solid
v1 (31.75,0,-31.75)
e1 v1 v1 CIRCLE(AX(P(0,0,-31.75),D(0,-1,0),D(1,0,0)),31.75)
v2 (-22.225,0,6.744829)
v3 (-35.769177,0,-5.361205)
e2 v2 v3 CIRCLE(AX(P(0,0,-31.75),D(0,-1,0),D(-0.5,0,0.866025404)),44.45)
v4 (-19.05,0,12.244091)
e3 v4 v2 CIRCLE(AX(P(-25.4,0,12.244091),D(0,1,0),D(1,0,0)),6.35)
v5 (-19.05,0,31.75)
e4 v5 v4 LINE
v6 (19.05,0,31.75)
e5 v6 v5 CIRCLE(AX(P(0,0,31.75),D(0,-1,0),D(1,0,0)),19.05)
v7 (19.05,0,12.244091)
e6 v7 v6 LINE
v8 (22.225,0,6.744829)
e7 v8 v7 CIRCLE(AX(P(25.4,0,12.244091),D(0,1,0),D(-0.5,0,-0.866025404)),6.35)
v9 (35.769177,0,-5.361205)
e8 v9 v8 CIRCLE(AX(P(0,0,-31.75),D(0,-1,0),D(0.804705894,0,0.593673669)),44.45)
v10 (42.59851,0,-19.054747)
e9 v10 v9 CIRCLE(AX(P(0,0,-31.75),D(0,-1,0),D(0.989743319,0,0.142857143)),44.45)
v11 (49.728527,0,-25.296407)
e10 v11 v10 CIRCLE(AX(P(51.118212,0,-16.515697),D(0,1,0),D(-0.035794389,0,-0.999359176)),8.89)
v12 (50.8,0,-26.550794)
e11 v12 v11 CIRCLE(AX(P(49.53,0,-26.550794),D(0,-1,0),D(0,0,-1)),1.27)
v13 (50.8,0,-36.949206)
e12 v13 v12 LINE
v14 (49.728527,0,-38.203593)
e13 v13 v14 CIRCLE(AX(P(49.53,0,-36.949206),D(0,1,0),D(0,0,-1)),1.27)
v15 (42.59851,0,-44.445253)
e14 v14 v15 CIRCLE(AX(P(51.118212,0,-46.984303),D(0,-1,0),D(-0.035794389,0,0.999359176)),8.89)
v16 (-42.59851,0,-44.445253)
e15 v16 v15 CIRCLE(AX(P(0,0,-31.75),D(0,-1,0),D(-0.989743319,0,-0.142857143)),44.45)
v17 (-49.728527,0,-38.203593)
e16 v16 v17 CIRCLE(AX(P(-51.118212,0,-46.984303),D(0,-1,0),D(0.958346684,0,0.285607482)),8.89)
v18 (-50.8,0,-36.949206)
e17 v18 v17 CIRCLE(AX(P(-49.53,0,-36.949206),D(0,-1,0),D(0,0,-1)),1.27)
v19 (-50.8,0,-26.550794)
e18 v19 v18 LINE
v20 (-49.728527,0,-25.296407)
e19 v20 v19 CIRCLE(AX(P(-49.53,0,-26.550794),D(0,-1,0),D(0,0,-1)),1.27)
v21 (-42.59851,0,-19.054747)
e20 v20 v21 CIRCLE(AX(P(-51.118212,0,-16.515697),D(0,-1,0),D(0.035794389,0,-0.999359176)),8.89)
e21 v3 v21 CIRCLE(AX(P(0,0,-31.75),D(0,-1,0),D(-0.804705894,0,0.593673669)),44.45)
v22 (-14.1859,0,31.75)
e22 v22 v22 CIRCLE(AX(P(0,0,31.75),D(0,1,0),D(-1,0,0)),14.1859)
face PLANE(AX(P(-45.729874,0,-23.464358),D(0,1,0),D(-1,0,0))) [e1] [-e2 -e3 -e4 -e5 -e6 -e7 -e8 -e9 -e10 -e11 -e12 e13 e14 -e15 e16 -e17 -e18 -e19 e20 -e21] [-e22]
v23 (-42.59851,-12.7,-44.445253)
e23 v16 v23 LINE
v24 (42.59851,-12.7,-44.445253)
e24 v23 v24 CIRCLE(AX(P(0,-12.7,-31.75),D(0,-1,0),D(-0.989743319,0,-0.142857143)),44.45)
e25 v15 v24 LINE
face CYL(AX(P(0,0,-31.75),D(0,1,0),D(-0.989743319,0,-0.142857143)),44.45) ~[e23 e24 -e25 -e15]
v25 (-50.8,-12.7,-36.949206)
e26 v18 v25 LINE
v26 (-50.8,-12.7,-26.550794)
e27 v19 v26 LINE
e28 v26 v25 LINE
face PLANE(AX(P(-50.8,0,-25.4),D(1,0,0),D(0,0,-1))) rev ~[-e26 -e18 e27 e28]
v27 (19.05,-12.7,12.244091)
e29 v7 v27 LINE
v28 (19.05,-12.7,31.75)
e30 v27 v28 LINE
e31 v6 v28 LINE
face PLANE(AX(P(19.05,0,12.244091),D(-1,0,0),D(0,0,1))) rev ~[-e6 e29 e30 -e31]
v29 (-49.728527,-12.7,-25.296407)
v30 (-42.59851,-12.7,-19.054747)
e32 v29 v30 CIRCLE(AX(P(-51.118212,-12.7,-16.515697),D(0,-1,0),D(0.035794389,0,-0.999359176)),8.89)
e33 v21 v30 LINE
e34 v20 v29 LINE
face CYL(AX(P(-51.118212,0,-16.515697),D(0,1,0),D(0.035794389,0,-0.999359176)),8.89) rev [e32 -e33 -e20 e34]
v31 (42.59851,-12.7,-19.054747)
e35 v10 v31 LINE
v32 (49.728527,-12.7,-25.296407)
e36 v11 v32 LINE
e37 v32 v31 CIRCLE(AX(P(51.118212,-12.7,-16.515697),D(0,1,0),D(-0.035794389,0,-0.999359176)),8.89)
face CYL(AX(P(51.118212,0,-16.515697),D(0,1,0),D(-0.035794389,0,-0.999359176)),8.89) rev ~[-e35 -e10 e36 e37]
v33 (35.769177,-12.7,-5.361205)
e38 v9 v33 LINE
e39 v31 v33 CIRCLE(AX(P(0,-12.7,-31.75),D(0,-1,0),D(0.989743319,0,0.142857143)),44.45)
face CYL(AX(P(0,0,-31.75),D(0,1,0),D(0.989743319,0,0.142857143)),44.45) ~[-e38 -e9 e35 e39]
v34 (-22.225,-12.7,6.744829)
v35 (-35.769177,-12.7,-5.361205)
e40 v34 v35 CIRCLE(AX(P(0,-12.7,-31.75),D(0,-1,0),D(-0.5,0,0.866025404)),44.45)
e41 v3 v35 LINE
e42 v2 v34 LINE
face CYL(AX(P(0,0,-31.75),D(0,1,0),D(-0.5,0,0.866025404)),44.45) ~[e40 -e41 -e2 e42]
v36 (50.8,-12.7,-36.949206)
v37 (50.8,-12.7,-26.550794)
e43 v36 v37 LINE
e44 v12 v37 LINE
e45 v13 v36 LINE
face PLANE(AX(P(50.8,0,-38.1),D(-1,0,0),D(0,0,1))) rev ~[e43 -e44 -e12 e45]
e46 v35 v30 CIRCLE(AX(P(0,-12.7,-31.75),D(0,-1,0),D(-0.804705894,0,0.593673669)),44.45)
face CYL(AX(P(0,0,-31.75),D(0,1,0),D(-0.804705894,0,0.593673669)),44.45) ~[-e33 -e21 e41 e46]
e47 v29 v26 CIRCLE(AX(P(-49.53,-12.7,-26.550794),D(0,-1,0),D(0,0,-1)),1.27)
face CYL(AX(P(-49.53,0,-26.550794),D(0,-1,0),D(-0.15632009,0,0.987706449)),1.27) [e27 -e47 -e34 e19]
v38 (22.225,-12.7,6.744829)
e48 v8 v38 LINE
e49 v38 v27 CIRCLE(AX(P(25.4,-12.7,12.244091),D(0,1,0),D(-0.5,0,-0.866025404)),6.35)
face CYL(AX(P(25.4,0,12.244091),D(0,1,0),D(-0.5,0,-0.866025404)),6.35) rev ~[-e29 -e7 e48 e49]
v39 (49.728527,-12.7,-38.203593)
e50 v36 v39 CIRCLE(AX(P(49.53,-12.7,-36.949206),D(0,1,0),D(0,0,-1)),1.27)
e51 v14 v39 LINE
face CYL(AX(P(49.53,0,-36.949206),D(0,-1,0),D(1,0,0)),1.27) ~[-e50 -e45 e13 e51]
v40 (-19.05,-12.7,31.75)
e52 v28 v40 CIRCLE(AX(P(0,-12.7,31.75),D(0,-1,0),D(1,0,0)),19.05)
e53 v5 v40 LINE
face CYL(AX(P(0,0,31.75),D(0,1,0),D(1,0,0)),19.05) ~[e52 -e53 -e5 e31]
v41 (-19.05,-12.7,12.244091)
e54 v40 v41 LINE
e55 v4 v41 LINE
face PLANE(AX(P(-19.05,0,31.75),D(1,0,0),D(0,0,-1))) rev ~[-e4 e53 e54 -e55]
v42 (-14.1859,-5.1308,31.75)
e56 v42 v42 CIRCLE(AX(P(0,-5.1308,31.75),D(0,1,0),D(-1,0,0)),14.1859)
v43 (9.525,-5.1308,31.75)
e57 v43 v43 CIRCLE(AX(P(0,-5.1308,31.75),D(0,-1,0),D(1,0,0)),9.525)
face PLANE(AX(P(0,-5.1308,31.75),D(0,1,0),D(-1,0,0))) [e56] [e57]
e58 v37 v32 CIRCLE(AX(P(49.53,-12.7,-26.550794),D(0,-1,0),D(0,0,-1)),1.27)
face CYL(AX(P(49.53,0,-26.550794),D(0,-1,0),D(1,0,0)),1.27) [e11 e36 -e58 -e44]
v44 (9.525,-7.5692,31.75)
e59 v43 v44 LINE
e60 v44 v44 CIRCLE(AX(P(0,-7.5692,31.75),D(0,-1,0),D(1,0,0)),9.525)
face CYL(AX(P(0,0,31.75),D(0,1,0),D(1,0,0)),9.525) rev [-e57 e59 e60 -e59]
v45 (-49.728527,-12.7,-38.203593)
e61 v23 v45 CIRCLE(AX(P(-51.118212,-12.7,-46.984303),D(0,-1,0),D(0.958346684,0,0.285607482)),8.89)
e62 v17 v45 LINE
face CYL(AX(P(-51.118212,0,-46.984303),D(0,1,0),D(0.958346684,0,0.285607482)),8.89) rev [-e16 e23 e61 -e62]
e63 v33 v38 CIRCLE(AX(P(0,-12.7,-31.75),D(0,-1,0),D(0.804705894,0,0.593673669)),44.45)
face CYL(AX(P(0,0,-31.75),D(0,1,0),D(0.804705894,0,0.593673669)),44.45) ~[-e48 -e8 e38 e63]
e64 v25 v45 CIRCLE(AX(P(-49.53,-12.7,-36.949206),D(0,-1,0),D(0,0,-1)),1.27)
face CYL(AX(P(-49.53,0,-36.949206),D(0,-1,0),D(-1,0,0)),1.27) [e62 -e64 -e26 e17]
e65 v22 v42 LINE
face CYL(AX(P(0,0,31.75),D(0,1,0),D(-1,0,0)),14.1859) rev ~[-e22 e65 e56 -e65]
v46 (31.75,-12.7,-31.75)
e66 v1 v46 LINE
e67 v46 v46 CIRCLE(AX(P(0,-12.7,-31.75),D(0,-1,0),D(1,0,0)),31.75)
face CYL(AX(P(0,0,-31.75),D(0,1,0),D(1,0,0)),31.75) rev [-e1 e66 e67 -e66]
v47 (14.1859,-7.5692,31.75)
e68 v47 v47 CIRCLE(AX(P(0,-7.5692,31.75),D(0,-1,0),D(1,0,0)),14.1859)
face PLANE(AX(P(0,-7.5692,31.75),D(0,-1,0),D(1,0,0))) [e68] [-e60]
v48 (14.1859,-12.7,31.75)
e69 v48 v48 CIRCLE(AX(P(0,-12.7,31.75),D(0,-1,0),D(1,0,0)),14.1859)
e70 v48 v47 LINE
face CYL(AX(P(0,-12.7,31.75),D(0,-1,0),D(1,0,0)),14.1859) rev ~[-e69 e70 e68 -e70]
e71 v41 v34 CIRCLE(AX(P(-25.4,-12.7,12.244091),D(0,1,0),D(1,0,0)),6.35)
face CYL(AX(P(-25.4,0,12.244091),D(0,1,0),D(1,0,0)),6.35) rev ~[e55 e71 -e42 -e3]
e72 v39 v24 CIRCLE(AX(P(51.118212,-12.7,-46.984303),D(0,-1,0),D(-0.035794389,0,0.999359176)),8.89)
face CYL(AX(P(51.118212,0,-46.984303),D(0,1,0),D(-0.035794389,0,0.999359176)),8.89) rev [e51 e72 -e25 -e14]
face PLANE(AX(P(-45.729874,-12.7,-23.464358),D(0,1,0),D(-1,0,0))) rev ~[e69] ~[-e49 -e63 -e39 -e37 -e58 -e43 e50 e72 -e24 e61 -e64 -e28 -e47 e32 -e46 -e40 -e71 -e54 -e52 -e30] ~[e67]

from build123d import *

# Parameters (mm, degrees)
F0_R        = 31.75
F0_R_2      = 9.525
F1_DEPTH    = 12.7
F2_T1_DEPTH = 12.7
F3_R        = 1.27
F4_R        = 14.1859
F4_R_2      = 9.525
F5_DEPTH    = 5.1308
F6_R        = 14.1859
F6_R_2      = 9.525
F7_DEPTH    = 5.1308


# Not quite as in the source:
# - a fillet or chamfer that OpenCascade refuses, or shapes differently, is made with other operations: its cross-section is extruded or revolved along the edge and cut away or added


with BuildPart() as f1:
    # F0 (on Front) → F1 (new body)
    with BuildSketch(Plane.XZ):
        with BuildLine():
            Line((19.05, 12.2440905122), (19.05, 31.75))
            ThreePointArc((19.05, 31.75), (0, 50.8), (-19.05, 31.75))
            Line((-19.05, 31.75), (-19.05, 12.2440905122))
            ThreePointArc((-19.05, 12.2440905122), (-19.900738686, 9.0690905122), (-22.225, 6.7448291982))
            ThreePointArc((-22.225, 6.7448291982), (-29.6221228011, 1.3910974586), (-35.7691769709, -5.3612054307))
            ThreePointArc((-35.7691769709, -5.3612054307), (-41.1209561154, -14.8719234463), (-43.9940905122, -25.4))
            Line((-43.9940905122, -25.4), (-50.8, -25.4))
            Line((-50.8, -25.4), (-50.8, -38.1))
            Line((-50.8, -38.1), (-43.9940905122, -38.1))
            ThreePointArc((-43.9940905122, -38.1), (0, -76.2), (43.9940905122, -38.1))
            Line((43.9940905122, -38.1), (50.8, -38.1))
            Line((50.8, -38.1), (50.8, -25.4))
            Line((50.8, -25.4), (43.9940905122, -25.4))
            ThreePointArc((43.9940905122, -25.4), (41.1209561154, -14.8719234463), (35.7691769709, -5.3612054307))
            ThreePointArc((35.7691769709, -5.3612054307), (29.6221228011, 1.3910974586), (22.225, 6.7448291982))
            ThreePointArc((22.225, 6.7448291982), (19.900738686, 9.0690905122), (19.05, 12.2440905122))
        make_face()
        with Locations((0, -31.75)):
            Circle(F0_R, mode=Mode.SUBTRACT)
        with Locations((0, 31.75)):
            Circle(F0_R_2, mode=Mode.SUBTRACT)
    extrude(amount=F1_DEPTH)

    # F2: fillet of radius 8.89 on 4 edges, made by hand

    # F2_s2 → F2_t1 (join)
    with BuildSketch(Plane.XZ):
        with BuildLine():
            ThreePointArc((-50.8, -25.4), (-45.6782912458, -23.5470098171), (-42.5985100968, -19.0547474412))
            ThreePointArc((-42.5985100968, -19.0547474412), (-43.4123850712, -22.2018419352), (-43.9940905122, -25.4))
            Line((-43.9940905122, -25.4), (-50.8, -25.4))
        make_face()
        with BuildLine():
            ThreePointArc((50.8, -25.4), (45.6782912458, -23.5470098171), (42.5985100968, -19.0547474412))
            ThreePointArc((42.5985100968, -19.0547474412), (43.4123850712, -22.2018419352), (43.9940905122, -25.4))
            Line((43.9940905122, -25.4), (50.8, -25.4))
        make_face()
        with BuildLine():
            ThreePointArc((-42.5985100968, -44.4452525588), (-45.6782912458, -39.9529901829), (-50.8, -38.1))
            Line((-50.8, -38.1), (-43.9940905122, -38.1))
            ThreePointArc((-43.9940905122, -38.1), (-43.4123850712, -41.2981580648), (-42.5985100968, -44.4452525588))
        make_face()
        with BuildLine():
            ThreePointArc((50.8, -38.1), (45.6782912458, -39.9529901829), (42.5985100968, -44.4452525588))
            ThreePointArc((42.5985100968, -44.4452525588), (43.4123850712, -41.2981580648), (43.9940905122, -38.1))
            Line((43.9940905122, -38.1), (50.8, -38.1))
        make_face()
    extrude(amount=F2_T1_DEPTH)

    # F3
    f3_edges = [f1.edges().sort_by_distance(p)[0] for p in [
        (-50.8, -6.35, -25.4),
        (-50.8, -6.35, -38.1),
        (50.8, -6.35, -25.4),
        (50.8, -6.35, -38.1),
    ]]
    fillet(f3_edges, radius=F3_R)

    # F4 (on face) → F5 (cut)
    with BuildSketch(Plane.XZ.offset(12.7)):
        with Locations((0, 31.75)):
            Circle(F4_R)
        with Locations((0, 31.75)):
            Circle(F4_R_2, mode=Mode.SUBTRACT)
    extrude(amount=-F5_DEPTH, mode=Mode.SUBTRACT)

    # F6 (on face) → F7 (cut)
    with BuildSketch(Plane(origin=(0, 0, 0), x_dir=(-1, 0, 0), z_dir=(0, 1, 0))):
        with Locations((0, 31.75)):
            Circle(F6_R)
        with Locations((0, 31.75)):
            Circle(F6_R_2, mode=Mode.SUBTRACT)
    extrude(amount=-F7_DEPTH, mode=Mode.SUBTRACT)


solid = f1.part
